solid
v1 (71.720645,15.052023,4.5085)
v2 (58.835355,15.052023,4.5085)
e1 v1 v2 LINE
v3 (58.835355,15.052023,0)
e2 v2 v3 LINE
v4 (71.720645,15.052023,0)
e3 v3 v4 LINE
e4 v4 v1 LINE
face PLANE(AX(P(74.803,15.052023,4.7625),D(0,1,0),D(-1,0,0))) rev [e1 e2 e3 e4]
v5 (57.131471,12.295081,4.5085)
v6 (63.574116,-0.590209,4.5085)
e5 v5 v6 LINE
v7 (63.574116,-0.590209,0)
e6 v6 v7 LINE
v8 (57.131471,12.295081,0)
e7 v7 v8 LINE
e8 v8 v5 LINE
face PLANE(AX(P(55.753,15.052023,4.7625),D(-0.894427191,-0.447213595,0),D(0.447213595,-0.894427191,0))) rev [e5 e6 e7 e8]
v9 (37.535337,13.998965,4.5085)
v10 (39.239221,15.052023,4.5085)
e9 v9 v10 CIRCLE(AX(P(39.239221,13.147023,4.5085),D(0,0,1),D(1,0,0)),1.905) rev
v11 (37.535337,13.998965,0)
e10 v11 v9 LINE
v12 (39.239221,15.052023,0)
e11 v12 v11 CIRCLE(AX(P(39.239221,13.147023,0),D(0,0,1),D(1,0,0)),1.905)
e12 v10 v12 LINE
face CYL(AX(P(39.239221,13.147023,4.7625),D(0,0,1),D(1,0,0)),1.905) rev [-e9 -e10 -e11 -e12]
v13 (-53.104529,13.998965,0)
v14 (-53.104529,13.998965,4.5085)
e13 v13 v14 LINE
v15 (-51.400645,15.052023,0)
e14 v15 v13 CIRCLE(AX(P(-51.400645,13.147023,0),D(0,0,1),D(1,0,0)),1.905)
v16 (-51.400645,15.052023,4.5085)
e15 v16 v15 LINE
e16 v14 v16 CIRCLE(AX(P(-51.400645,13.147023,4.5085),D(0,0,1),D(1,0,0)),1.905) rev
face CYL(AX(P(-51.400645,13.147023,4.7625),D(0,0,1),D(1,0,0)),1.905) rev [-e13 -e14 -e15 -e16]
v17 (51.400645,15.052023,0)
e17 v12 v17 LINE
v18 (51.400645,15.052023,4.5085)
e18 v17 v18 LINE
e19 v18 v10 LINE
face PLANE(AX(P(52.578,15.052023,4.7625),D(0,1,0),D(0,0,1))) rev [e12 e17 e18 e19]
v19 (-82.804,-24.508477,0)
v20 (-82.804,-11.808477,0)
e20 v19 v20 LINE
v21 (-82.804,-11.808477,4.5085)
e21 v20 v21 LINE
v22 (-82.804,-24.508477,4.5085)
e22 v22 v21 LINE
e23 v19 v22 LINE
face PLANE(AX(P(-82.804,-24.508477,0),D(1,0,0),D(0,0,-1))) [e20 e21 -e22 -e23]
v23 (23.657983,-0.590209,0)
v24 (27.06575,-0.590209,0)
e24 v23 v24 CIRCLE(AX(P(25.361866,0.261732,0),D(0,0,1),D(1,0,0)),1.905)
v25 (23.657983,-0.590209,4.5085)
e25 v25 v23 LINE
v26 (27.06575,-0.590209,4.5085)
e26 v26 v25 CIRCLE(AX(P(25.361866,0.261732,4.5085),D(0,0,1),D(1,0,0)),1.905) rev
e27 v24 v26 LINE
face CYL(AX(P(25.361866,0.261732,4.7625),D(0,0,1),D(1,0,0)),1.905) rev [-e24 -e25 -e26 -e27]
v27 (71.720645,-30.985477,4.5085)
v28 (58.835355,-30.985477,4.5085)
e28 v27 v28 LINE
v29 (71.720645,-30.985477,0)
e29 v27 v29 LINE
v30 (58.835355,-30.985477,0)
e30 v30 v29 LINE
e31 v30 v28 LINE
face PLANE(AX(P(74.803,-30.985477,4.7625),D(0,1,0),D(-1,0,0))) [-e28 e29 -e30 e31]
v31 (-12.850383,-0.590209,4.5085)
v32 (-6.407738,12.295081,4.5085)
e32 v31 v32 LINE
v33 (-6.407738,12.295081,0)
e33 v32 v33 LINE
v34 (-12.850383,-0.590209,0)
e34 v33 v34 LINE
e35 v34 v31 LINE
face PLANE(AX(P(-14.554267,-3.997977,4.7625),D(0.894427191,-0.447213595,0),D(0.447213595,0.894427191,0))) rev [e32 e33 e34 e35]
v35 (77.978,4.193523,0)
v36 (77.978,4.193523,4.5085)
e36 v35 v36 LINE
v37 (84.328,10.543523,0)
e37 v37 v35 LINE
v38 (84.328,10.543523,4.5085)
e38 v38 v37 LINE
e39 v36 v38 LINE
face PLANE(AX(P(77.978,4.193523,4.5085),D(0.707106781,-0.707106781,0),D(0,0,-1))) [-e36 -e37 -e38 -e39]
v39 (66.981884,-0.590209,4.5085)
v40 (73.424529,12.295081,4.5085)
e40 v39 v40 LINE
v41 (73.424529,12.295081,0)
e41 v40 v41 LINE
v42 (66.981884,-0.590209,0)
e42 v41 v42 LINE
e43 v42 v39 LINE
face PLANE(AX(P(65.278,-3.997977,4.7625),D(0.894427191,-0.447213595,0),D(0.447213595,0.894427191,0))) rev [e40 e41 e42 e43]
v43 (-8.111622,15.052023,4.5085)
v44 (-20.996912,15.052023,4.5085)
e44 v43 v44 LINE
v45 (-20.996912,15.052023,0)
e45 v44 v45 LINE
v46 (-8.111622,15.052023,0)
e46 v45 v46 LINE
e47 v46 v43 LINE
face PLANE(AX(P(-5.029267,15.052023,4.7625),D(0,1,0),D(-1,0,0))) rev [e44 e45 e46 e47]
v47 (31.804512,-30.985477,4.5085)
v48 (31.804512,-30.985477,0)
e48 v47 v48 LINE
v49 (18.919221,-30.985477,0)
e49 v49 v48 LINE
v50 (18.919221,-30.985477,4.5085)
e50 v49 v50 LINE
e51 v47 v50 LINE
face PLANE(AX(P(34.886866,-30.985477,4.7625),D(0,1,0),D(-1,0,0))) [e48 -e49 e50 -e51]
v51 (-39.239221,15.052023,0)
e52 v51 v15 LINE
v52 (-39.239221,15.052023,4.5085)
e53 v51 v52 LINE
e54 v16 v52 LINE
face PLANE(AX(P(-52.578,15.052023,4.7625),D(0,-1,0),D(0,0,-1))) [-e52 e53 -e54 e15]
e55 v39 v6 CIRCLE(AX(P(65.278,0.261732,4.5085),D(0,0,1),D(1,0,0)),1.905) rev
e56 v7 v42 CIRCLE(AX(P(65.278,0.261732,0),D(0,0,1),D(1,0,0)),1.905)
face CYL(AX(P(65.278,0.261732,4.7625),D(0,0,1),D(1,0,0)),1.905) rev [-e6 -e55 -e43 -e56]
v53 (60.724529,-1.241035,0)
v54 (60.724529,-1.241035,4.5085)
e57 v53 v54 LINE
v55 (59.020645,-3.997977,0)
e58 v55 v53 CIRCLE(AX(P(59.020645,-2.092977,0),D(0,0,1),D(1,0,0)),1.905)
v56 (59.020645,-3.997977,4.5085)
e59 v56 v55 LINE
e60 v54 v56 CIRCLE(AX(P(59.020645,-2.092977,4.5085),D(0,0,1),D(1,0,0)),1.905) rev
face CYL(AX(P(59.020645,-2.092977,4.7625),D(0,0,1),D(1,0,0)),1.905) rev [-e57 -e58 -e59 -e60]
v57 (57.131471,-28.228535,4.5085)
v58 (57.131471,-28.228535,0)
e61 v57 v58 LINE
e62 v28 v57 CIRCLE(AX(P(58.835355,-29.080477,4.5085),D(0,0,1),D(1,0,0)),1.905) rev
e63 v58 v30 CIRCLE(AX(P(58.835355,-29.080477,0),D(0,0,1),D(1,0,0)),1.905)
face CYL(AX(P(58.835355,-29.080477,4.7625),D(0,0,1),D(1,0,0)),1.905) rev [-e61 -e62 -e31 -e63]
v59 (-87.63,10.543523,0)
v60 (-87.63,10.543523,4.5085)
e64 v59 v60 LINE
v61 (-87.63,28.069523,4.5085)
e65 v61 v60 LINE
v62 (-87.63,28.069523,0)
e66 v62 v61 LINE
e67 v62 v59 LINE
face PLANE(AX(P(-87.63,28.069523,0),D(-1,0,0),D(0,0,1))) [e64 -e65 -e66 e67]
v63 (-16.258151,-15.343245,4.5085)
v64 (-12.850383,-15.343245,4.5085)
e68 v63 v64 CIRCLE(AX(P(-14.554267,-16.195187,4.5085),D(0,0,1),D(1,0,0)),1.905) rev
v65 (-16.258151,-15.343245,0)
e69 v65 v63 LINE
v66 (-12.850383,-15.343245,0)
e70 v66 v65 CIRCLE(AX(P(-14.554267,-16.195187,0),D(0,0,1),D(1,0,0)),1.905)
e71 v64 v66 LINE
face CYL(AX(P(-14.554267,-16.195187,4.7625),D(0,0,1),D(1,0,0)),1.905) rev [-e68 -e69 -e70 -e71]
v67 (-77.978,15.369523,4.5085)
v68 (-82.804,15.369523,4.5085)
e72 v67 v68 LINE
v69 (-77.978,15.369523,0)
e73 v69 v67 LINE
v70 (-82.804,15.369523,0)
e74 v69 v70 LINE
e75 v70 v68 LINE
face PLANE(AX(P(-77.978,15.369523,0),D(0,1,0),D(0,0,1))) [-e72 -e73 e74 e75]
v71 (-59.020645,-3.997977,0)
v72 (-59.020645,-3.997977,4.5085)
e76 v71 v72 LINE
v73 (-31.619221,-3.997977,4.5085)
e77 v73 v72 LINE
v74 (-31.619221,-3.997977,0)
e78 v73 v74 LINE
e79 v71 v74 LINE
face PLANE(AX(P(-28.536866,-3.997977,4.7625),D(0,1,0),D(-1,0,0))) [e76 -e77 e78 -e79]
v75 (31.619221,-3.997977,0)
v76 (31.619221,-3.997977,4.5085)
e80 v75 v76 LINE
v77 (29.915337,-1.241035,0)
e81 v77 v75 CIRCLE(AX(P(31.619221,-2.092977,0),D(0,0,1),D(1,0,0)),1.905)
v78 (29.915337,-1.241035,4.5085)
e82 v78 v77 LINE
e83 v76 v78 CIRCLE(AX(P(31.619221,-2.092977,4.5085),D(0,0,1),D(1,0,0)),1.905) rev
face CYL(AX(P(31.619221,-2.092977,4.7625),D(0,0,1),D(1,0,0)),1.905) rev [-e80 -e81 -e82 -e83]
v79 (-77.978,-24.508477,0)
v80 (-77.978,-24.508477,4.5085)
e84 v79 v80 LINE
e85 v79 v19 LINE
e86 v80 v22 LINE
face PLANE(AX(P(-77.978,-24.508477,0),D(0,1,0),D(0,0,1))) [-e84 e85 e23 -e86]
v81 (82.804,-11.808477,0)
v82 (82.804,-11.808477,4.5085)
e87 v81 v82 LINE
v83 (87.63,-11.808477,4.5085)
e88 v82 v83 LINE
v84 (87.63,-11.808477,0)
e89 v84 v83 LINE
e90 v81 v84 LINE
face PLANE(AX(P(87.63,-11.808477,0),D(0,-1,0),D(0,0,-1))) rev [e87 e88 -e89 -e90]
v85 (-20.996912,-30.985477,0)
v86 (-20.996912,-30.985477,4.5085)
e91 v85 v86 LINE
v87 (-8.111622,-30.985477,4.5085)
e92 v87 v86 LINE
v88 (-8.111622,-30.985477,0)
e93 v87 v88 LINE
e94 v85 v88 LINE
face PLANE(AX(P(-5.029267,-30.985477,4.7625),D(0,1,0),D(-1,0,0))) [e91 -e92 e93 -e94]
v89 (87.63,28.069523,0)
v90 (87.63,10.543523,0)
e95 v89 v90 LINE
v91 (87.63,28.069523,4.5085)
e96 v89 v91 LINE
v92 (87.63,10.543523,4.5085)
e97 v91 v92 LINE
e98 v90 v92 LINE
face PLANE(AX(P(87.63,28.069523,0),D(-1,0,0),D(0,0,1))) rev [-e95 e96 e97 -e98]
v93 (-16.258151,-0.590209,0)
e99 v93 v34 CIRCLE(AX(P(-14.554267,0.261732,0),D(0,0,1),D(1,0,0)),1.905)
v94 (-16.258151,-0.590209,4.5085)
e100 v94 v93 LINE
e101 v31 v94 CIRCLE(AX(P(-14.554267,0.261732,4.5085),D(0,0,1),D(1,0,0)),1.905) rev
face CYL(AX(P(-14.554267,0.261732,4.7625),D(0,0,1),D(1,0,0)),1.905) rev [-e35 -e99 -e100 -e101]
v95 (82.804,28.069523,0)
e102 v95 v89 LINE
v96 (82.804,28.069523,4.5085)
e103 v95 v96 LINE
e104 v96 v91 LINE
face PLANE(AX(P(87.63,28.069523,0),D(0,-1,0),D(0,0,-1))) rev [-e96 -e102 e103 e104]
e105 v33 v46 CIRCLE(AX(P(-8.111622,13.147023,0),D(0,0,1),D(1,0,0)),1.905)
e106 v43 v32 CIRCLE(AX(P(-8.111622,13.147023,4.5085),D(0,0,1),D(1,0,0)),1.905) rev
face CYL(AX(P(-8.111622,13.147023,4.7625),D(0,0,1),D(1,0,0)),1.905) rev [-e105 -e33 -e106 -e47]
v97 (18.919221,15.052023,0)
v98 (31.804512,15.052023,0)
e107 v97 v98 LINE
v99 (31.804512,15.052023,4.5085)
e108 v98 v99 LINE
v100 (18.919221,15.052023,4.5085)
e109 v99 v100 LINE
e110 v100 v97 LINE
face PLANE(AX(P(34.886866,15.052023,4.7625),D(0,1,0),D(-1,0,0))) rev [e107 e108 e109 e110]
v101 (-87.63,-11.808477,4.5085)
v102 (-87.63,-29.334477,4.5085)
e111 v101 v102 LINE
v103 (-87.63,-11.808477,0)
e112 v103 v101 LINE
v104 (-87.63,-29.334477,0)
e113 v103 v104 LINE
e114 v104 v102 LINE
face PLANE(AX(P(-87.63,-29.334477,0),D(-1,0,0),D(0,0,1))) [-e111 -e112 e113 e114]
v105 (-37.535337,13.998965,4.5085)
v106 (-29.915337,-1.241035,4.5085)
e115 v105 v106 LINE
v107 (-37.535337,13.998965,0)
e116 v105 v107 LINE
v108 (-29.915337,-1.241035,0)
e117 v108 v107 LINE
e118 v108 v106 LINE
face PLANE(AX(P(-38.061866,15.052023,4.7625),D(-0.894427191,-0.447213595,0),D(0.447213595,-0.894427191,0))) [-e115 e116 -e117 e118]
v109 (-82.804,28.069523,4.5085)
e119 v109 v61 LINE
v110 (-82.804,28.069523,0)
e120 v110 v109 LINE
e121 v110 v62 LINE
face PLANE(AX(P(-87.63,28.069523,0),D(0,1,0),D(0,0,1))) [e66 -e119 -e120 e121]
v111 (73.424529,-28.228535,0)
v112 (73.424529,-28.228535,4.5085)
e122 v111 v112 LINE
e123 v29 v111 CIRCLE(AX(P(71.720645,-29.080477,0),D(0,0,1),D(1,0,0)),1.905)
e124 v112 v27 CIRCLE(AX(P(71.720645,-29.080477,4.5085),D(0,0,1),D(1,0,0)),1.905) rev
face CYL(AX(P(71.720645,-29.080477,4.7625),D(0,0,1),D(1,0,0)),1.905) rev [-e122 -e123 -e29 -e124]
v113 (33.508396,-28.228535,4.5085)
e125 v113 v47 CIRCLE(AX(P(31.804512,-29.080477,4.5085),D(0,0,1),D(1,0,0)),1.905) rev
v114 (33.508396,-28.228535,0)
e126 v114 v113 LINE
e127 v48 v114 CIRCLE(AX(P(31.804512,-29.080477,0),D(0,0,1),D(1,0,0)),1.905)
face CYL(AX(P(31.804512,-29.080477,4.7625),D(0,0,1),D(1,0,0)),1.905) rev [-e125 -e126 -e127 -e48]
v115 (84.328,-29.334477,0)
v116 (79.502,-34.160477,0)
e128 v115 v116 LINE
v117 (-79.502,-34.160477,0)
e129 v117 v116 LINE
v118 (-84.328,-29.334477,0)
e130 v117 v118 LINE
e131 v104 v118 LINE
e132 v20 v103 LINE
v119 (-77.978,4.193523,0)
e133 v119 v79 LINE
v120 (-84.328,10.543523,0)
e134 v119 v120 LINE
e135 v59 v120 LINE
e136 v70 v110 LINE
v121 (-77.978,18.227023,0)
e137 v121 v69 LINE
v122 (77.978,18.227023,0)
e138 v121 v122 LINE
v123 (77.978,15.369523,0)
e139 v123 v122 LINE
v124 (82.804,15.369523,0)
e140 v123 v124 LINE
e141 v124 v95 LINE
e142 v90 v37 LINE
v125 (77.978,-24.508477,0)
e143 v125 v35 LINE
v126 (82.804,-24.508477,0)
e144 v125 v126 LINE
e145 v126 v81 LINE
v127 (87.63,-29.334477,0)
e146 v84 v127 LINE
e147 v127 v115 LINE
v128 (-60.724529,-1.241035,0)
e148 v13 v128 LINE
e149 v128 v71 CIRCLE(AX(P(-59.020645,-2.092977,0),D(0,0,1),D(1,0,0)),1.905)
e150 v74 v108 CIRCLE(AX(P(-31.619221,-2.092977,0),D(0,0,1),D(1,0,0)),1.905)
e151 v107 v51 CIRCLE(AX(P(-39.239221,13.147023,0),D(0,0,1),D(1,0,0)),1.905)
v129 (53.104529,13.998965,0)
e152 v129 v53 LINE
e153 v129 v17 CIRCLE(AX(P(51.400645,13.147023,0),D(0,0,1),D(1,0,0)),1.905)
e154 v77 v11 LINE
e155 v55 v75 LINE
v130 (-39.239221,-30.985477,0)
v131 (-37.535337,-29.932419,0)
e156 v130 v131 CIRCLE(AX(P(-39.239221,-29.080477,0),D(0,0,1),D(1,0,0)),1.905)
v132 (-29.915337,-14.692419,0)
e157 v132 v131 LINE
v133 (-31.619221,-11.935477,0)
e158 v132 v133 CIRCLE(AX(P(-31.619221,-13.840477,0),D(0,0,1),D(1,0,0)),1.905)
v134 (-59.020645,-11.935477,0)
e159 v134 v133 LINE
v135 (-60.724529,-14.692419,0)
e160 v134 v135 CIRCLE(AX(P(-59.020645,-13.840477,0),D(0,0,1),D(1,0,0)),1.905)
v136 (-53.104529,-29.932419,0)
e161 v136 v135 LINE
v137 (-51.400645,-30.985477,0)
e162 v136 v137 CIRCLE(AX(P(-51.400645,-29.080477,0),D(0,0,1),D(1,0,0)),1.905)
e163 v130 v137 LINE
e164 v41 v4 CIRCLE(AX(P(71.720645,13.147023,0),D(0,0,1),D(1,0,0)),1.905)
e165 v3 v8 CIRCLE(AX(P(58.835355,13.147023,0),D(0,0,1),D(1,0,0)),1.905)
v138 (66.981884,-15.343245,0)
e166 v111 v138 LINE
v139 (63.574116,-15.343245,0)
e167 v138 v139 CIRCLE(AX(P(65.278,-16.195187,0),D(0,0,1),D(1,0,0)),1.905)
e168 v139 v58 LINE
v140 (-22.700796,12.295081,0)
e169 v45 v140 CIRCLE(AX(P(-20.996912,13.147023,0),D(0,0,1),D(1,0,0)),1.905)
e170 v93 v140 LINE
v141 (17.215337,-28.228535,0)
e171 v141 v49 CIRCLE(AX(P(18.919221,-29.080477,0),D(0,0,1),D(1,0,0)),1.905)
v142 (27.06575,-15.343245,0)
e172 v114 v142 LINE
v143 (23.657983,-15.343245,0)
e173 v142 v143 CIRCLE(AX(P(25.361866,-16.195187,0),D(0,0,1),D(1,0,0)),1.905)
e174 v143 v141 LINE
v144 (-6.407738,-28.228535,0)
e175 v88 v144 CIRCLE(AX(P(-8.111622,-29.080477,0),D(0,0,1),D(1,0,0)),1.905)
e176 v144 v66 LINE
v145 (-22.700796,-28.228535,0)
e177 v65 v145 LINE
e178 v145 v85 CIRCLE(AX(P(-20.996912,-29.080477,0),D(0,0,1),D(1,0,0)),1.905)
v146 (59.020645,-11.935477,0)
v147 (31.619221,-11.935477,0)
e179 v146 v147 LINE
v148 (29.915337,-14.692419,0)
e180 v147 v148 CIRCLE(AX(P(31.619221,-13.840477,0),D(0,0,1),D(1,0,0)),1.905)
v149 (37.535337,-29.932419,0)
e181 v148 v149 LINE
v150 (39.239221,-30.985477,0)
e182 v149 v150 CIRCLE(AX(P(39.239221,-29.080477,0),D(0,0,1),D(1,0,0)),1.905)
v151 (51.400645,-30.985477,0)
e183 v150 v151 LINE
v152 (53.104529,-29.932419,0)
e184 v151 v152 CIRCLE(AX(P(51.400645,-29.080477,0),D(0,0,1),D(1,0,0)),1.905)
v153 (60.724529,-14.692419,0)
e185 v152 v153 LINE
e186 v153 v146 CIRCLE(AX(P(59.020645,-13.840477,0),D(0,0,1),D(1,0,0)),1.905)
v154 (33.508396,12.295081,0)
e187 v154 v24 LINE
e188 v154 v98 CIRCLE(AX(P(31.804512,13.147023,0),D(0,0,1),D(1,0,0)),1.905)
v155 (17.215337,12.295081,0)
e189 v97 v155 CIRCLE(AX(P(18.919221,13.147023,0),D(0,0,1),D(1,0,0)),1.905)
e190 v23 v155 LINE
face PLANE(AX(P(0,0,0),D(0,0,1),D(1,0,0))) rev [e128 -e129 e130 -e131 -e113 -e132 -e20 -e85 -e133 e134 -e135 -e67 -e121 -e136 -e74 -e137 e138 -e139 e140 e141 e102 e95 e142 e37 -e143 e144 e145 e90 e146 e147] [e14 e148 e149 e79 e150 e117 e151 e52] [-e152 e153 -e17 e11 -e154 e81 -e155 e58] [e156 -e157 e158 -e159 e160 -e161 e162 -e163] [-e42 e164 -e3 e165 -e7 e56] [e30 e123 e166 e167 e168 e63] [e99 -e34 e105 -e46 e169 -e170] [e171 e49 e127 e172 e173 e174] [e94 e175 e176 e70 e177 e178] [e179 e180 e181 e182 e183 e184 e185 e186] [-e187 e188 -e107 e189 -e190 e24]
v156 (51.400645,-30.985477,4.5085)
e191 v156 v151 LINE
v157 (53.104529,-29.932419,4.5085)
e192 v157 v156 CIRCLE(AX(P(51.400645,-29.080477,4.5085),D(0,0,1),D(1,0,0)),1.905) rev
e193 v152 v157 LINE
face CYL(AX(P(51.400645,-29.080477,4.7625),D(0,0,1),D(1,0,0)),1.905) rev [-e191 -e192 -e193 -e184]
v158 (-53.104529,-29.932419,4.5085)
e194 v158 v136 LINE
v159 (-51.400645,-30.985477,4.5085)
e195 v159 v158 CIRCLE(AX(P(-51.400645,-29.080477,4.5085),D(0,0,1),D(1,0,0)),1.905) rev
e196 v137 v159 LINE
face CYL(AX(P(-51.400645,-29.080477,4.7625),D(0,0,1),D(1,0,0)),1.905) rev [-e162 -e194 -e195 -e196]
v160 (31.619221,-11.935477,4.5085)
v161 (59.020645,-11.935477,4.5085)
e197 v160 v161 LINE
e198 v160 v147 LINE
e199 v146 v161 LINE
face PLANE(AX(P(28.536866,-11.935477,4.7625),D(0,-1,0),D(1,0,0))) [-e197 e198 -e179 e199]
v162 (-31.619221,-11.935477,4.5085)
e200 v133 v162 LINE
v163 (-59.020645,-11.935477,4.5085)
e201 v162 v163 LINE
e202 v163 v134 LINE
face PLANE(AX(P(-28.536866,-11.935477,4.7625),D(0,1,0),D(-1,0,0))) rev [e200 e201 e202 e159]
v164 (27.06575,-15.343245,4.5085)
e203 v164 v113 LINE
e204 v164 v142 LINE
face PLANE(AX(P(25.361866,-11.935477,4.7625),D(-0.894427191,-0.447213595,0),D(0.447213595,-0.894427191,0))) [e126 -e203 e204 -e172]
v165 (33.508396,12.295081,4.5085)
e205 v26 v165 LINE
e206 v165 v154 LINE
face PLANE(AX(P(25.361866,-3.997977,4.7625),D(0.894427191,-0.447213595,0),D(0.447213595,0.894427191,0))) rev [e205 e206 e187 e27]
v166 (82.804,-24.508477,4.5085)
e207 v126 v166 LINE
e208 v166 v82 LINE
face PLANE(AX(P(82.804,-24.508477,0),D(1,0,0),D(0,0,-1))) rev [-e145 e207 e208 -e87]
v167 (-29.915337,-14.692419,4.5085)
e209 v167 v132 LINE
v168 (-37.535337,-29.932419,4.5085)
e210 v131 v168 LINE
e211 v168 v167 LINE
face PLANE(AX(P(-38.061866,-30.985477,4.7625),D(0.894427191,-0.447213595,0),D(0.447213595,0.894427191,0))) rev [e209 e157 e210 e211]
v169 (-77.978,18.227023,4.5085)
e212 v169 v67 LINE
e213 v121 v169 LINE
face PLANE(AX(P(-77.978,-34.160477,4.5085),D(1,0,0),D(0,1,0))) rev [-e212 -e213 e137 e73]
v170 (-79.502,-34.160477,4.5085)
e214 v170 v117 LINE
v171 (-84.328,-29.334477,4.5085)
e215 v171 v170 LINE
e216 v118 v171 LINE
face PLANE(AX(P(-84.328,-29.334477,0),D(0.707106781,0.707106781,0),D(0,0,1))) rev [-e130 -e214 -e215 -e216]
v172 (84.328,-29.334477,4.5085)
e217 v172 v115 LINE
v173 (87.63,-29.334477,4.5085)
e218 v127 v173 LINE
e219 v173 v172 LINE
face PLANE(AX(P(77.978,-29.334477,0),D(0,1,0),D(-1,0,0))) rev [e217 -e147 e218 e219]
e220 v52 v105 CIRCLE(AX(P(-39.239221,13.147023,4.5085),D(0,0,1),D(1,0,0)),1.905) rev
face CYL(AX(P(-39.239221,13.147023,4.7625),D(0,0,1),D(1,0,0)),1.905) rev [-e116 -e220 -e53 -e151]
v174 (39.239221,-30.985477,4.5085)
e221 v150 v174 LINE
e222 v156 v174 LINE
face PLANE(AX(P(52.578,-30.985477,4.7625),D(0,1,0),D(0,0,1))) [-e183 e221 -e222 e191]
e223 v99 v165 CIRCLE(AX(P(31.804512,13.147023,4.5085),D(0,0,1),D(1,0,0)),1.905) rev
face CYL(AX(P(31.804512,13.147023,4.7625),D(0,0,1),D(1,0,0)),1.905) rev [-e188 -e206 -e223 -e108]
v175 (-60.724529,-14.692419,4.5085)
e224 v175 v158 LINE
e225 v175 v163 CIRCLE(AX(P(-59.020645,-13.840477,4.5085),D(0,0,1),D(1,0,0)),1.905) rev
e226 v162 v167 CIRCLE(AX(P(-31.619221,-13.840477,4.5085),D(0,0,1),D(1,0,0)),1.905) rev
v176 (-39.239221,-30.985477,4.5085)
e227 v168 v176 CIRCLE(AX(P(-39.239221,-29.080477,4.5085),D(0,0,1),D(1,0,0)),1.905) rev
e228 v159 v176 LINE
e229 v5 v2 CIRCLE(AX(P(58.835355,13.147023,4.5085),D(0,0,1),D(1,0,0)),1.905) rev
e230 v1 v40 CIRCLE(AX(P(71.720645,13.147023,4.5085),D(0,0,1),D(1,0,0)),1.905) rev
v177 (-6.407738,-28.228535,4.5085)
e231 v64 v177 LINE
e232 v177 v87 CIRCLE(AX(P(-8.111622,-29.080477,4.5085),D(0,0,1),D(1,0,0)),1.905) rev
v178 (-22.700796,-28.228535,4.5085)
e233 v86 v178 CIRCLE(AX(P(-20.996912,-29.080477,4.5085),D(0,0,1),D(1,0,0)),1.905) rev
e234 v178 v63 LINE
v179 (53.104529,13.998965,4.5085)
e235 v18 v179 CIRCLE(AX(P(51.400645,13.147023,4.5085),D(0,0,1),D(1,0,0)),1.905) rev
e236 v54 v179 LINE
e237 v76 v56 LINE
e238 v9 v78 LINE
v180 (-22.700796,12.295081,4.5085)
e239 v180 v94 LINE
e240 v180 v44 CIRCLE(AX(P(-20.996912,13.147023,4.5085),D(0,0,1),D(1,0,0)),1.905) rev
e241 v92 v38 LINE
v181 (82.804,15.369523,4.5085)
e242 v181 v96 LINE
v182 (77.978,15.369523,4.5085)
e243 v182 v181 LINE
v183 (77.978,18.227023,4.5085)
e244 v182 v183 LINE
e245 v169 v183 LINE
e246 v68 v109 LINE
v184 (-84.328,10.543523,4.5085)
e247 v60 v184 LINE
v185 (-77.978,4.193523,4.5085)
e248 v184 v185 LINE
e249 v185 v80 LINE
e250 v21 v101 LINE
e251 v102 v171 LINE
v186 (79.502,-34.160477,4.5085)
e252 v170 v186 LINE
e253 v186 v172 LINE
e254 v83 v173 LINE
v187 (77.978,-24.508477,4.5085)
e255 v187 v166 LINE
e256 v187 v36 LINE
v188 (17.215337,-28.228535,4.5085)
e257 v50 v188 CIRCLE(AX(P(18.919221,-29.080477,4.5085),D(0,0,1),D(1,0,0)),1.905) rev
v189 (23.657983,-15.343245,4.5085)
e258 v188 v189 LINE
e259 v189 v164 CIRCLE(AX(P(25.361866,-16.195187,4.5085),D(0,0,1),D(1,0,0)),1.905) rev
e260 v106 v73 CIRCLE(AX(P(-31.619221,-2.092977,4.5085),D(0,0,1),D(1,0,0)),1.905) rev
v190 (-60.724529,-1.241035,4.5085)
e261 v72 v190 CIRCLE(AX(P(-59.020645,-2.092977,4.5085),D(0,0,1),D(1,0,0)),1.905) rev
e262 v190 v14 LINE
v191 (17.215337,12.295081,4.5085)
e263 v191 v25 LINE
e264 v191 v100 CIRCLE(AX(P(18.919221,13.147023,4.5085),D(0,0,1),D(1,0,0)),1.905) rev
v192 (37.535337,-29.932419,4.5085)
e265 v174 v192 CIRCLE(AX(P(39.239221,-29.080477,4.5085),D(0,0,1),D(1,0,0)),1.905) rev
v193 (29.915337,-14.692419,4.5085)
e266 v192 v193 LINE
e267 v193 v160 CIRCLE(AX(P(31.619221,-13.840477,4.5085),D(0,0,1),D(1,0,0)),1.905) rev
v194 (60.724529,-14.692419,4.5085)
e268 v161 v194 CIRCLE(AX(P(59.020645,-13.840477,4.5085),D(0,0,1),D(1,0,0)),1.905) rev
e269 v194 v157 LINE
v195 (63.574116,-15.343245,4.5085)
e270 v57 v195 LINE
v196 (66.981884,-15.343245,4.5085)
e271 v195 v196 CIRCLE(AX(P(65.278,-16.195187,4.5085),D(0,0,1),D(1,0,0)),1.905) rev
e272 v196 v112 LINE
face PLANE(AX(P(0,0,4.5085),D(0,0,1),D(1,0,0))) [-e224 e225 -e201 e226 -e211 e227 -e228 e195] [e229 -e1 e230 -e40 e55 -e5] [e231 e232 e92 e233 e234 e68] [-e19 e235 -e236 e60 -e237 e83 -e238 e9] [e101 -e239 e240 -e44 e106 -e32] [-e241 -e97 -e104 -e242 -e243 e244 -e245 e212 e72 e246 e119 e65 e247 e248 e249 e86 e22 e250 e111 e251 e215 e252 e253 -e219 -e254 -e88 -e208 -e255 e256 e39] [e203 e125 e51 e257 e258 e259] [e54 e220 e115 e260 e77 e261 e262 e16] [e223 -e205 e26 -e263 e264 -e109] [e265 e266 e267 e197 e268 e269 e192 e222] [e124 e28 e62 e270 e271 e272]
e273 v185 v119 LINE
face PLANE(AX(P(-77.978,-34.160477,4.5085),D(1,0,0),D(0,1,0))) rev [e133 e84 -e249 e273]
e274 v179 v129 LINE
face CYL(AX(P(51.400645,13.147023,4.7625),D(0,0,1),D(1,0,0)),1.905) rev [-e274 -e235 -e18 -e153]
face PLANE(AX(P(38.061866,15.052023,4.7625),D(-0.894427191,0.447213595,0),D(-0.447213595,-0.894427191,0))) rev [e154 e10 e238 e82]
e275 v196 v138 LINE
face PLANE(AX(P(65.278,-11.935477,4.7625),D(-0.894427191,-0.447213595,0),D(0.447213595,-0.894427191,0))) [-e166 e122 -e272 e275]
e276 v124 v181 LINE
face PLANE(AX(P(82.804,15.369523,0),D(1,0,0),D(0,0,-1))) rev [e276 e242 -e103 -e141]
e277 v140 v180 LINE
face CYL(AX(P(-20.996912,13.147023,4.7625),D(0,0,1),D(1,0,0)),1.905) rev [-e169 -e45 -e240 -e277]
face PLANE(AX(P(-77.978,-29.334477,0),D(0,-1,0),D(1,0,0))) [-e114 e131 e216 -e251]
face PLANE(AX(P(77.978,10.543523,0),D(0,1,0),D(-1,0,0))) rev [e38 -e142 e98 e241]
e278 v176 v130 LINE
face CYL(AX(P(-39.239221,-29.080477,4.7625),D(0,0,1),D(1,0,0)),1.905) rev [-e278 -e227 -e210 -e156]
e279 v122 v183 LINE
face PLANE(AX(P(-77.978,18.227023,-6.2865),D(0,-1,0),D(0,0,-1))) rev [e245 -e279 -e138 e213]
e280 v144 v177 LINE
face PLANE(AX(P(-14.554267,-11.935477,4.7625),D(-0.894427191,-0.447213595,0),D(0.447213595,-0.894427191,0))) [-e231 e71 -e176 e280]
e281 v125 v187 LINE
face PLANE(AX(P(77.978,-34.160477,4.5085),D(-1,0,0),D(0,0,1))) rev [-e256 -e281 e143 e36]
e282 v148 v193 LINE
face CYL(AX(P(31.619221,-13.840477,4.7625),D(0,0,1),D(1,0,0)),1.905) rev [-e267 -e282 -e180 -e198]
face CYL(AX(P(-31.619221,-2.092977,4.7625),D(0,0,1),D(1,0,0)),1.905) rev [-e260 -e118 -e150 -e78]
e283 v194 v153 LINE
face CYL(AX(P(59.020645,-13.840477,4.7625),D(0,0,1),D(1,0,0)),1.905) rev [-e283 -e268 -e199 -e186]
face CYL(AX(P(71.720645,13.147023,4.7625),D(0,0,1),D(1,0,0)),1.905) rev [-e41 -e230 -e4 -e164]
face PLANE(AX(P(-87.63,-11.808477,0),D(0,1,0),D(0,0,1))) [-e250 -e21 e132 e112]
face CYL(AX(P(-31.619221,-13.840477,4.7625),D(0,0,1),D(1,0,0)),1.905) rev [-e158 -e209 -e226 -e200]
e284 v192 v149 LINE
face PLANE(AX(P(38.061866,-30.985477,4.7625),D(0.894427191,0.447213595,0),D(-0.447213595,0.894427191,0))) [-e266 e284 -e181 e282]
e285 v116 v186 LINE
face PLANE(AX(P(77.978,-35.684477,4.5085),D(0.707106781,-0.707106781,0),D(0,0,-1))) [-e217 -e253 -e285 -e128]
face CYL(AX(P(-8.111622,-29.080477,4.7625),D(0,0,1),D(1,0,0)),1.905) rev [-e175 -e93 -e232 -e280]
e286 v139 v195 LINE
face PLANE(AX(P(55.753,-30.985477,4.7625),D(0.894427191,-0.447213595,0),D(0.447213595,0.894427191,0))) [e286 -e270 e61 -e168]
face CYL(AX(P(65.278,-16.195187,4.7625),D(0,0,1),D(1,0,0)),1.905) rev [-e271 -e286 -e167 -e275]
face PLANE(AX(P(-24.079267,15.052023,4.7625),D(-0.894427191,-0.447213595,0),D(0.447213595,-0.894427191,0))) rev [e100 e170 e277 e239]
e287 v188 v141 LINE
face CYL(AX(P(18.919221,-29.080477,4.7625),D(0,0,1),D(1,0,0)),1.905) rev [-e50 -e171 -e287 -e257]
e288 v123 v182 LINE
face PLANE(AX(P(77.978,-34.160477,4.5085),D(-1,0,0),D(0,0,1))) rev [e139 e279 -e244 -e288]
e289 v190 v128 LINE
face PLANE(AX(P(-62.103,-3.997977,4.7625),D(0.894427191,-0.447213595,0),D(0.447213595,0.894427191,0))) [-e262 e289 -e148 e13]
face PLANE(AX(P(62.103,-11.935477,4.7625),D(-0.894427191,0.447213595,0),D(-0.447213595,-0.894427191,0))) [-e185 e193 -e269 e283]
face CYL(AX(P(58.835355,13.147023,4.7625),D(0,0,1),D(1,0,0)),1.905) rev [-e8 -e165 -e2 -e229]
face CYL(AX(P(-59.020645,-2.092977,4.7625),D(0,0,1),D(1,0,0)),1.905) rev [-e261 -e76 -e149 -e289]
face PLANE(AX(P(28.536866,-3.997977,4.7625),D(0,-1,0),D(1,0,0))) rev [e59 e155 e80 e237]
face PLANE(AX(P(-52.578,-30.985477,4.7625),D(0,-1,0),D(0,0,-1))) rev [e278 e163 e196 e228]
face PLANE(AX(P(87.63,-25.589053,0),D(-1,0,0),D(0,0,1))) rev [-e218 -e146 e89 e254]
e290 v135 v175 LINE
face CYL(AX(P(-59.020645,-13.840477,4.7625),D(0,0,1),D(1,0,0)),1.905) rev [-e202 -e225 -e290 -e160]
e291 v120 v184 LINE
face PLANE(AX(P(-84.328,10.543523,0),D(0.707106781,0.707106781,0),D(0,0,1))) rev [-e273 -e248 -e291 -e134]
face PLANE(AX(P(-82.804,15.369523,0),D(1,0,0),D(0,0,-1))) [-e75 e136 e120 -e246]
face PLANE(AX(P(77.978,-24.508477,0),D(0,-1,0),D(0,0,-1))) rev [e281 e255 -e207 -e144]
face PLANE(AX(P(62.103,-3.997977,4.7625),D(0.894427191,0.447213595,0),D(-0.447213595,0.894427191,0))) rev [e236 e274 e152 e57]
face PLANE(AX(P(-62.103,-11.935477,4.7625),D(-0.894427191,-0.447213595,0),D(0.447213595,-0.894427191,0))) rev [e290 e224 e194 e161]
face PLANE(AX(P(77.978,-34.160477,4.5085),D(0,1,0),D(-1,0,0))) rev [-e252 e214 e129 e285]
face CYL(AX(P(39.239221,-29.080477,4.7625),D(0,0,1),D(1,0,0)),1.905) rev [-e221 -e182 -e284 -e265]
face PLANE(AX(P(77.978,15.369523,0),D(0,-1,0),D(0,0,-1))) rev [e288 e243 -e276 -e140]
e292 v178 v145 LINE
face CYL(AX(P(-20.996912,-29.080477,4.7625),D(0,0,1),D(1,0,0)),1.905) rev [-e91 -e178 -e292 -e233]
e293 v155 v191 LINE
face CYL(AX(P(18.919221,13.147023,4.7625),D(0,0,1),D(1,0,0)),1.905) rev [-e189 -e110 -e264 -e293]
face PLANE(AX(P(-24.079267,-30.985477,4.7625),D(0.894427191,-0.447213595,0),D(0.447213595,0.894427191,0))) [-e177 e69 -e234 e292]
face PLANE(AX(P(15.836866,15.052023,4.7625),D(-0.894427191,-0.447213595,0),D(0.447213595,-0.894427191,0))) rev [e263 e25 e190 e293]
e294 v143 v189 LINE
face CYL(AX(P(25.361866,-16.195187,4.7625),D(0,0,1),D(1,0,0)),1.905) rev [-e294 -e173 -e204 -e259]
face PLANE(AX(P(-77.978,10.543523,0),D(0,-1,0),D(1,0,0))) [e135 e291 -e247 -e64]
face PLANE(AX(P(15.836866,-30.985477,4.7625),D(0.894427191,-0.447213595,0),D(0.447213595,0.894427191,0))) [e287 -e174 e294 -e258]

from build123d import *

# Parameters (mm, degrees)
SKETCH1_W            = 155.956
SKETCH1_H            = 68.320954018
BOSS_EXTRUDE1_DEPTH  = 4.5085
SKETCH2_W            = 155.956
SKETCH2_H            = 15.933454036
CUT_EXTRUDE1_DEPTH   = 10.795
BOSS_EXTRUDE2_DEPTH  = 4.5085
CUT_EXTRUDE2_DEPTH   = 4.7625
LPATTERN1_COUNT      = 3
LPATTERN1_PITCH      = 39.916133528
CUT_EXTRUDE3_DEPTH   = 4.7625
FILLET2_R            = 1.905
MIRROR3_COPY_1_DEPTH = 4.7625
MIRROR3_COPY_2_DEPTH = 4.7625
MIRROR3_COPY_3_DEPTH = 4.7625
FILLET3_R            = 1.905
CHAMFER1_SIZE        = 6.35


with BuildPart() as part:
    # Sketch1 → Boss-Extrude1 (new body)
    with BuildSketch(Plane.XY):
        Rectangle(SKETCH1_W, SKETCH1_H)
    extrude(amount=BOSS_EXTRUDE1_DEPTH)

    # Sketch2 → Cut-Extrude1 (cut)
    with BuildSketch(Plane.XY.offset(4.5085)):
        with Locations((0, 26.193749991)):
            Rectangle(SKETCH2_W, SKETCH2_H)
    extrude(amount=-CUT_EXTRUDE1_DEPTH, mode=Mode.SUBTRACT)

    # Sketch3 → Boss-Extrude2 (add)
    with BuildSketch(Plane.XY.offset(4.5085)):
        Polygon((-77.978, -29.334477009), (-87.63, -29.334477009), (-87.63, -25.589053013), (-87.63, -11.808477009), (-82.804, -11.808477009), (-82.804, -24.508477009), (-77.978, -24.508477009), align=None)
        Polygon((-77.978, 10.543522991), (-87.63, 10.543522991), (-87.63, 28.069522991), (-82.804, 28.069522991), (-82.804, 15.369522991), (-77.978, 15.369522991), align=None)
    boss_extrude2 = extrude(amount=-BOSS_EXTRUDE2_DEPTH)

    # Mirror1: Boss-Extrude2 across plane
    add(boss_extrude2.mirror(Plane(origin=(0, 0, 0), x_dir=(0, 0, 1), z_dir=(1, 0, 0))))

    # Sketch4 → Cut-Extrude2 (cut)
    with BuildSketch(Plane(origin=(0, 0, 0), x_dir=(-1, 0, 0), z_dir=(0, 0, -1))):
        Polygon((-74.803, 15.052022991), (-55.753, 15.052022991), (-65.278, -3.997977009), align=None)
    cut_extrude2 = extrude(amount=-CUT_EXTRUDE2_DEPTH, mode=Mode.SUBTRACT)

    # LPattern1: Cut-Extrude2 ×3
    with Locations(*[(-i * LPATTERN1_PITCH, 0, 0) for i in range(1, LPATTERN1_COUNT)]):
        add(cut_extrude2, mode=Mode.SUBTRACT)

    # Sketch5 → Cut-Extrude3 (cut)
    with BuildSketch(Plane(origin=(0, 0, 0), x_dir=(-1, 0, 0), z_dir=(0, 0, -1))):
        Polygon((-52.578, 15.052022991), (-38.061866472, 15.052022991), (-28.536866472, -3.997977009), (-62.103, -3.997977009), align=None)
    cut_extrude3 = extrude(amount=-CUT_EXTRUDE3_DEPTH, mode=Mode.SUBTRACT)

    # Mirror2: Cut-Extrude3 across plane
    add(cut_extrude3.mirror(Plane(origin=(0, 0, 0), x_dir=(0, 0, 1), z_dir=(1, 0, 0))), mode=Mode.SUBTRACT)

    # Fillet2
    fillet2_edges = [part.edges().sort_by_distance(p)[0] for p in [
        (65.278, -3.997977009, 2.25425),
        (74.803, 15.052022991, 2.25425),
        (55.753, 15.052022991, 2.25425),
        (25.361866472, -3.997977009, 2.25425),
        (34.886866472, 15.052022991, 2.25425),
        (15.836866472, 15.052022991, 2.25425),
        (-5.029267056, 15.052022991, 2.25425),
        (-14.554267056, -3.997977009, 2.25425),
        (-24.079267056, 15.052022991, 2.25425),
    ]]
    fillet(fillet2_edges, radius=FILLET2_R)

    # Mirror3: Cut-Extrude2, Cut-Extrude3 across plane
    add(cut_extrude2.mirror(Plane.ZX.offset(-7.966727018)), mode=Mode.SUBTRACT)
    add(cut_extrude3.mirror(Plane.ZX.offset(-7.966727018)), mode=Mode.SUBTRACT)

    # Mirror3 copy 1 sketch → Mirror3 copy 1 (cut)
    with BuildSketch(Plane(origin=(-39.916133528, -15.933454036, 0), x_dir=(-1, 0, 0), z_dir=(0, 0, -1))):
        Polygon((-74.803, -15.052022991), (-55.753, -15.052022991), (-65.278, 3.997977009), align=None)
    extrude(amount=-MIRROR3_COPY_1_DEPTH, mode=Mode.SUBTRACT)

    # Mirror3 copy 2 sketch → Mirror3 copy 2 (cut)
    with BuildSketch(Plane(origin=(-79.832267056, -15.933454036, 0), x_dir=(-1, 0, 0), z_dir=(0, 0, -1))):
        Polygon((-74.803, -15.052022991), (-55.753, -15.052022991), (-65.278, 3.997977009), align=None)
    extrude(amount=-MIRROR3_COPY_2_DEPTH, mode=Mode.SUBTRACT)

    # Mirror3 copy 3 sketch → Mirror3 copy 3 (cut)
    with BuildSketch(Plane(origin=(0, -15.933454036, 0), x_dir=(1, 0, 0), z_dir=(0, 0, -1))):
        Polygon((-52.578, 15.052022991), (-38.061866472, 15.052022991), (-28.536866472, -3.997977009), (-62.103, -3.997977009), align=None)
    extrude(amount=-MIRROR3_COPY_3_DEPTH, mode=Mode.SUBTRACT)

    # Fillet3
    fillet3_edges = [part.edges().sort_by_distance(p)[0] for p in [
        (62.103, -3.997977009, 2.25425),
        (52.578, 15.052022991, 2.25425),
        (38.061866472, 15.052022991, 2.25425),
        (28.536866472, -3.997977009, 2.25425),
        (-52.578, 15.052022991, 2.25425),
        (-62.103, -3.997977009, 2.25425),
        (-28.536866472, -3.997977009, 2.25425),
        (-38.061866472, 15.052022991, 2.25425),
        (74.803, -30.985477027, 2.25425),
        (65.278, -11.935477027, 2.25425),
        (55.753, -30.985477027, 2.25425),
        (34.886866472, -30.985477027, 2.25425),
        (25.361866472, -11.935477027, 2.25425),
        (15.836866472, -30.985477027, 2.25425),
        (-5.029267056, -30.985477027, 2.25425),
        (-14.554267056, -11.935477027, 2.25425),
        (-24.079267056, -30.985477027, 2.25425),
        (-62.103, -11.935477027, 2.25425),
        (-52.578, -30.985477027, 2.25425),
        (-38.061866472, -30.985477027, 2.25425),
        (-28.536866472, -11.935477027, 2.25425),
        (52.578, -30.985477027, 2.25425),
        (62.103, -11.935477027, 2.25425),
        (28.536866472, -11.935477027, 2.25425),
        (38.061866472, -30.985477027, 2.25425),
    ]]
    fillet(fillet3_edges, radius=FILLET3_R)

    # Chamfer1
    # the kernel refuses this chamfer: 6.35 mm, written as the material it adds along each edge
    with BuildSketch(Plane(origin=(-77.978, -29.334477009, 4.5085), x_dir=(-0.9996219169112966, 0.027495876610585696, 0), z_dir=(0, 0, -1))) as chamfer1_piece_1_section:
        Polygon((CHAMFER1_SIZE * 0.999621916911, -CHAMFER1_SIZE * 0.0274958766106), (-CHAMFER1_SIZE * 0.0274958766106, -CHAMFER1_SIZE * 0.999621916911), (0, 0), align=None)
    chamfer1_piece_1 = extrude(amount=4.5085, mode=Mode.PRIVATE)
    chamfer1_piece_1 = split(chamfer1_piece_1, bisect_by=Plane(origin=(-80.204608327, -34.160477009, 2.25425), z_dir=(0, 1, 0)), keep=Keep.TOP, mode=Mode.PRIVATE)
    add(chamfer1_piece_1)
    with BuildSketch(Plane(origin=(-77.978, 10.543522991, 4.5085), x_dir=(-0.9996219169112966, 0.02749587661058624, 0), z_dir=(0, 0, -1))) as chamfer1_piece_2:
        Polygon((CHAMFER1_SIZE * 0.999621916911, -CHAMFER1_SIZE * 0.0274958766106), (-CHAMFER1_SIZE * 0.0274958766106, -CHAMFER1_SIZE * 0.999621916911), (0, 0), align=None)
    extrude(amount=4.5085)
    with BuildSketch(Plane(origin=(77.978, -29.334477009, 4.5085), x_dir=(0.9996219169112966, 0.027495876610585696, 0), z_dir=(0, 0, -1))) as chamfer1_piece_3_section:
        Polygon((CHAMFER1_SIZE * 0.999621916911, CHAMFER1_SIZE * 0.0274958766106), (-CHAMFER1_SIZE * 0.0274958766106, CHAMFER1_SIZE * 0.999621916911), (0, 0), align=None)
    chamfer1_piece_3 = extrude(amount=4.5085, mode=Mode.PRIVATE)
    chamfer1_piece_3 = split(chamfer1_piece_3, bisect_by=Plane(origin=(80.204608327, -34.160477009, 2.25425), z_dir=(0, 1, 0)), keep=Keep.TOP, mode=Mode.PRIVATE)
    add(chamfer1_piece_3)
    with BuildSketch(Plane(origin=(77.978, 10.543522991, 4.5085), x_dir=(0.9996219169112966, 0.027495876610585966, 0), z_dir=(0, 0, -1))) as chamfer1_piece_4:
        Polygon((CHAMFER1_SIZE * 0.999621916911, CHAMFER1_SIZE * 0.0274958766106), (-CHAMFER1_SIZE * 0.0274958766106, CHAMFER1_SIZE * 0.999621916911), (0, 0), align=None)
    extrude(amount=4.5085)


solid = part.part
